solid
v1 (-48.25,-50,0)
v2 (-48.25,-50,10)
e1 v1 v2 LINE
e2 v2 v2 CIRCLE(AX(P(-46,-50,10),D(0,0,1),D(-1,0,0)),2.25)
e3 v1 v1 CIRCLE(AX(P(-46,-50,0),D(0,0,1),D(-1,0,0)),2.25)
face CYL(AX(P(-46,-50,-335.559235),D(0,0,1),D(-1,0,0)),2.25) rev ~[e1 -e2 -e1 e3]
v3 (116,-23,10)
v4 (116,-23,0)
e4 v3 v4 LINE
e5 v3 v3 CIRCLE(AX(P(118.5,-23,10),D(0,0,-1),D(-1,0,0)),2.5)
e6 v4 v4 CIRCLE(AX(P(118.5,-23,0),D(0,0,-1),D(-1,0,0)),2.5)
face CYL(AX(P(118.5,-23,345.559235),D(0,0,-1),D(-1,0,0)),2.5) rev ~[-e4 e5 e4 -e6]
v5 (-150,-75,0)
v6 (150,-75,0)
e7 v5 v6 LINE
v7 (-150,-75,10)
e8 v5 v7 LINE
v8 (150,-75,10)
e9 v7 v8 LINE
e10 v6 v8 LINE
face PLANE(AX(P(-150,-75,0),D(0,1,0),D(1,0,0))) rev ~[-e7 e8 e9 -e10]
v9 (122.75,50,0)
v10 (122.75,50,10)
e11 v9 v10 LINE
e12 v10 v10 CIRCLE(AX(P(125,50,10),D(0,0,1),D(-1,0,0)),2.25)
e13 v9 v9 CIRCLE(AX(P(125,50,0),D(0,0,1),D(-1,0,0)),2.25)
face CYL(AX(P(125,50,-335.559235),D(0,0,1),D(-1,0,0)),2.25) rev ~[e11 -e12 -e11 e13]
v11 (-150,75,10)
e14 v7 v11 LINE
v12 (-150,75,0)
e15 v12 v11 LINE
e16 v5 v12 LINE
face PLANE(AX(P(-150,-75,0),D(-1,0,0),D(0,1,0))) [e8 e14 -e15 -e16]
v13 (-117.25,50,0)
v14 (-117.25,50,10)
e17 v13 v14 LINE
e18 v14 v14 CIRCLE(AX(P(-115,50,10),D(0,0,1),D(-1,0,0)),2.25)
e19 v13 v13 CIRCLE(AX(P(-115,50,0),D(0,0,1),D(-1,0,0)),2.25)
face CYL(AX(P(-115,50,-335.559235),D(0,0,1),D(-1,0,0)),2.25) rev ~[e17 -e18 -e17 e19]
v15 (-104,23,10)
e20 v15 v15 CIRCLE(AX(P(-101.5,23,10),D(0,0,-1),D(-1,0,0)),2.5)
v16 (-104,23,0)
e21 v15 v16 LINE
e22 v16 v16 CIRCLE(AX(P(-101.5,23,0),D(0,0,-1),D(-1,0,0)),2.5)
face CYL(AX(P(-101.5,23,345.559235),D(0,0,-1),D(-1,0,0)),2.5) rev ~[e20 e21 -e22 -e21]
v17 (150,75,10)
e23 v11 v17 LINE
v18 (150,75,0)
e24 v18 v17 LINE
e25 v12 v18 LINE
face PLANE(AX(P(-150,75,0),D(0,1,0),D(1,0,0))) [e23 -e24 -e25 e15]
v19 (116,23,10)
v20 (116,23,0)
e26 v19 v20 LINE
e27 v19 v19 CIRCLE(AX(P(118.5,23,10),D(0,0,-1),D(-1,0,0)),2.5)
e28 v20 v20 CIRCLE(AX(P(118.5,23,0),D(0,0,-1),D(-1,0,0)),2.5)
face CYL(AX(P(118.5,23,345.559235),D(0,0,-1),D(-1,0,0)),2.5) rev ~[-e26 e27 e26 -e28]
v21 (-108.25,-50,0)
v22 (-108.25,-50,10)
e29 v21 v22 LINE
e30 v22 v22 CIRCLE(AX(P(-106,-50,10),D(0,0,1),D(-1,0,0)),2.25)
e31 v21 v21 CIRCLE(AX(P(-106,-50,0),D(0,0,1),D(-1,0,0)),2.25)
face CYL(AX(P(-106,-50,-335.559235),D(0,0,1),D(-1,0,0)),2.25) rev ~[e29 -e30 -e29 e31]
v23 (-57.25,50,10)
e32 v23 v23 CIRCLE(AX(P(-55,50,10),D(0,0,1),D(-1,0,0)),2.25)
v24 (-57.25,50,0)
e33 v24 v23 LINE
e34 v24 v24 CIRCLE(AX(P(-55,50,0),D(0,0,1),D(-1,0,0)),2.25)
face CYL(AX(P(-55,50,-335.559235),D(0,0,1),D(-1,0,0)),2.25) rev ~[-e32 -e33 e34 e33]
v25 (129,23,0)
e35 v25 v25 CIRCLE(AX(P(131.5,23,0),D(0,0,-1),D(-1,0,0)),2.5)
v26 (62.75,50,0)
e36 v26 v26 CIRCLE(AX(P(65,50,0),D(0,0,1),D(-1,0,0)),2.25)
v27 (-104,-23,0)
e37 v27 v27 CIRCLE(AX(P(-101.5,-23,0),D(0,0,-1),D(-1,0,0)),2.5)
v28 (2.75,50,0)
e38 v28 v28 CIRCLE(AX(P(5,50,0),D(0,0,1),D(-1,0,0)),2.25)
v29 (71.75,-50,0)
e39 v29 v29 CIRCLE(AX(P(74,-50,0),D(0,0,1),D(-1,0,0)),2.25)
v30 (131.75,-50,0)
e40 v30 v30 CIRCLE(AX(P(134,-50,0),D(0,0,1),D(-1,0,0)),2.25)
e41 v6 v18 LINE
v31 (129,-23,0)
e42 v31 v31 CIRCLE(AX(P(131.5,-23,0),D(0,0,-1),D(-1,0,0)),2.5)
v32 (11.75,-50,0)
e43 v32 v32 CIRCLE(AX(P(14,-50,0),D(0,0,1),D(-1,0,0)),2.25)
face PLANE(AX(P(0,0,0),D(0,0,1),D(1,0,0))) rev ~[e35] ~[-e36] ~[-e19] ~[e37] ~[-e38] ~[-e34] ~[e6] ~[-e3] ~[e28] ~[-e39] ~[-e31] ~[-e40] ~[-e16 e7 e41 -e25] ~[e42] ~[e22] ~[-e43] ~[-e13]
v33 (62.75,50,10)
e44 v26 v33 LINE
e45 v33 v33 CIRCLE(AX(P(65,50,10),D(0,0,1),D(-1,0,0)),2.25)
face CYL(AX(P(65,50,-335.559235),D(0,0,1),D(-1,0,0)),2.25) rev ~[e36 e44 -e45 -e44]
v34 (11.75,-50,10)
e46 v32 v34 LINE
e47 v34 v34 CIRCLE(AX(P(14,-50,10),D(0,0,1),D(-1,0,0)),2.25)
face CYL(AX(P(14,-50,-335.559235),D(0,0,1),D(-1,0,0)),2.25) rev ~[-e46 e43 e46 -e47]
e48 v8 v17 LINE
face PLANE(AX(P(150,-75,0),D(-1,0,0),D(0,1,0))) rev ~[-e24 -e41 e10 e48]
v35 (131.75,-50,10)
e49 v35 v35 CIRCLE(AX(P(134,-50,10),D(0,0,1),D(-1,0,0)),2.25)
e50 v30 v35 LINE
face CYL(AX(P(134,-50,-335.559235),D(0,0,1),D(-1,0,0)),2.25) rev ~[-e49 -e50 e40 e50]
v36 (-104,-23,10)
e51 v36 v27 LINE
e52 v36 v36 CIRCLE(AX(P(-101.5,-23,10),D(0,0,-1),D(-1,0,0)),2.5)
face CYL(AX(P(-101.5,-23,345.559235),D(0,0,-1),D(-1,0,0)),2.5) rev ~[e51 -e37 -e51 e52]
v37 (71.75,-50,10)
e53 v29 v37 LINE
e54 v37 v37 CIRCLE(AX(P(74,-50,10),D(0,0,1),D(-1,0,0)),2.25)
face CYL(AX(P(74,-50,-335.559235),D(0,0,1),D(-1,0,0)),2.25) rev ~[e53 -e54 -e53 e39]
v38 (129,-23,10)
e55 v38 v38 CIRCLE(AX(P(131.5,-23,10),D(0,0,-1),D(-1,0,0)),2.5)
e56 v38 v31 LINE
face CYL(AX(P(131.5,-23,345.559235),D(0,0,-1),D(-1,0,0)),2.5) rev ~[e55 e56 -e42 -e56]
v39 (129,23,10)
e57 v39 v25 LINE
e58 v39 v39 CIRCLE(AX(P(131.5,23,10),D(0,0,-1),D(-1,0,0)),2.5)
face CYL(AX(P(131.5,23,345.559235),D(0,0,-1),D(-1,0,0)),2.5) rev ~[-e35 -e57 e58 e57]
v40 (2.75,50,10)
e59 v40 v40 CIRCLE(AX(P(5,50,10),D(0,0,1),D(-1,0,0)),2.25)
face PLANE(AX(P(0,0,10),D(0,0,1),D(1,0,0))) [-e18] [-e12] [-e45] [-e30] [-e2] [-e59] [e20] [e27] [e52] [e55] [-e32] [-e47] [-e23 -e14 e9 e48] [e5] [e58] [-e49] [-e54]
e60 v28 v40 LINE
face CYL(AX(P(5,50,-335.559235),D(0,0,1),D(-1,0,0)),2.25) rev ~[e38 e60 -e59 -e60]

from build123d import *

# Parameters (mm, degrees)
F0_W     = 300
F0_H     = 150
F1_DEPTH = 10
F2_D     = 4.5
F4_D     = 5


# Not quite as in the source:
# - a feature names something its author has since deleted; it is built from what else it names


with BuildPart() as f1:
    # F0 (on Top) → F1 (new body)
    with BuildSketch(Plane.XY):
        Rectangle(F0_W, F0_H)
    extrude(amount=F1_DEPTH)

    # F2 (through all)
    with Locations(Plane(origin=(0, 0, 0), x_dir=(1, 0, 0), z_dir=(0, 0, -1))):
        with Locations((125, -50), (65, -50), (-55, -50), (-115, -50), (5, -50), (134, 50), (74, 50), (14, 50), (-46, 50), (-106, 50)):
            Hole(F2_D / 2)

    # F4 (through all)
    with Locations(Plane.XY.offset(10)):
        with Locations((118.5, 23), (131.5, 23), (131.5, -23), (118.5, -23), (-101.5, 23), (-101.5, -23)):
            Hole(F4_D / 2)


solid = f1.part
